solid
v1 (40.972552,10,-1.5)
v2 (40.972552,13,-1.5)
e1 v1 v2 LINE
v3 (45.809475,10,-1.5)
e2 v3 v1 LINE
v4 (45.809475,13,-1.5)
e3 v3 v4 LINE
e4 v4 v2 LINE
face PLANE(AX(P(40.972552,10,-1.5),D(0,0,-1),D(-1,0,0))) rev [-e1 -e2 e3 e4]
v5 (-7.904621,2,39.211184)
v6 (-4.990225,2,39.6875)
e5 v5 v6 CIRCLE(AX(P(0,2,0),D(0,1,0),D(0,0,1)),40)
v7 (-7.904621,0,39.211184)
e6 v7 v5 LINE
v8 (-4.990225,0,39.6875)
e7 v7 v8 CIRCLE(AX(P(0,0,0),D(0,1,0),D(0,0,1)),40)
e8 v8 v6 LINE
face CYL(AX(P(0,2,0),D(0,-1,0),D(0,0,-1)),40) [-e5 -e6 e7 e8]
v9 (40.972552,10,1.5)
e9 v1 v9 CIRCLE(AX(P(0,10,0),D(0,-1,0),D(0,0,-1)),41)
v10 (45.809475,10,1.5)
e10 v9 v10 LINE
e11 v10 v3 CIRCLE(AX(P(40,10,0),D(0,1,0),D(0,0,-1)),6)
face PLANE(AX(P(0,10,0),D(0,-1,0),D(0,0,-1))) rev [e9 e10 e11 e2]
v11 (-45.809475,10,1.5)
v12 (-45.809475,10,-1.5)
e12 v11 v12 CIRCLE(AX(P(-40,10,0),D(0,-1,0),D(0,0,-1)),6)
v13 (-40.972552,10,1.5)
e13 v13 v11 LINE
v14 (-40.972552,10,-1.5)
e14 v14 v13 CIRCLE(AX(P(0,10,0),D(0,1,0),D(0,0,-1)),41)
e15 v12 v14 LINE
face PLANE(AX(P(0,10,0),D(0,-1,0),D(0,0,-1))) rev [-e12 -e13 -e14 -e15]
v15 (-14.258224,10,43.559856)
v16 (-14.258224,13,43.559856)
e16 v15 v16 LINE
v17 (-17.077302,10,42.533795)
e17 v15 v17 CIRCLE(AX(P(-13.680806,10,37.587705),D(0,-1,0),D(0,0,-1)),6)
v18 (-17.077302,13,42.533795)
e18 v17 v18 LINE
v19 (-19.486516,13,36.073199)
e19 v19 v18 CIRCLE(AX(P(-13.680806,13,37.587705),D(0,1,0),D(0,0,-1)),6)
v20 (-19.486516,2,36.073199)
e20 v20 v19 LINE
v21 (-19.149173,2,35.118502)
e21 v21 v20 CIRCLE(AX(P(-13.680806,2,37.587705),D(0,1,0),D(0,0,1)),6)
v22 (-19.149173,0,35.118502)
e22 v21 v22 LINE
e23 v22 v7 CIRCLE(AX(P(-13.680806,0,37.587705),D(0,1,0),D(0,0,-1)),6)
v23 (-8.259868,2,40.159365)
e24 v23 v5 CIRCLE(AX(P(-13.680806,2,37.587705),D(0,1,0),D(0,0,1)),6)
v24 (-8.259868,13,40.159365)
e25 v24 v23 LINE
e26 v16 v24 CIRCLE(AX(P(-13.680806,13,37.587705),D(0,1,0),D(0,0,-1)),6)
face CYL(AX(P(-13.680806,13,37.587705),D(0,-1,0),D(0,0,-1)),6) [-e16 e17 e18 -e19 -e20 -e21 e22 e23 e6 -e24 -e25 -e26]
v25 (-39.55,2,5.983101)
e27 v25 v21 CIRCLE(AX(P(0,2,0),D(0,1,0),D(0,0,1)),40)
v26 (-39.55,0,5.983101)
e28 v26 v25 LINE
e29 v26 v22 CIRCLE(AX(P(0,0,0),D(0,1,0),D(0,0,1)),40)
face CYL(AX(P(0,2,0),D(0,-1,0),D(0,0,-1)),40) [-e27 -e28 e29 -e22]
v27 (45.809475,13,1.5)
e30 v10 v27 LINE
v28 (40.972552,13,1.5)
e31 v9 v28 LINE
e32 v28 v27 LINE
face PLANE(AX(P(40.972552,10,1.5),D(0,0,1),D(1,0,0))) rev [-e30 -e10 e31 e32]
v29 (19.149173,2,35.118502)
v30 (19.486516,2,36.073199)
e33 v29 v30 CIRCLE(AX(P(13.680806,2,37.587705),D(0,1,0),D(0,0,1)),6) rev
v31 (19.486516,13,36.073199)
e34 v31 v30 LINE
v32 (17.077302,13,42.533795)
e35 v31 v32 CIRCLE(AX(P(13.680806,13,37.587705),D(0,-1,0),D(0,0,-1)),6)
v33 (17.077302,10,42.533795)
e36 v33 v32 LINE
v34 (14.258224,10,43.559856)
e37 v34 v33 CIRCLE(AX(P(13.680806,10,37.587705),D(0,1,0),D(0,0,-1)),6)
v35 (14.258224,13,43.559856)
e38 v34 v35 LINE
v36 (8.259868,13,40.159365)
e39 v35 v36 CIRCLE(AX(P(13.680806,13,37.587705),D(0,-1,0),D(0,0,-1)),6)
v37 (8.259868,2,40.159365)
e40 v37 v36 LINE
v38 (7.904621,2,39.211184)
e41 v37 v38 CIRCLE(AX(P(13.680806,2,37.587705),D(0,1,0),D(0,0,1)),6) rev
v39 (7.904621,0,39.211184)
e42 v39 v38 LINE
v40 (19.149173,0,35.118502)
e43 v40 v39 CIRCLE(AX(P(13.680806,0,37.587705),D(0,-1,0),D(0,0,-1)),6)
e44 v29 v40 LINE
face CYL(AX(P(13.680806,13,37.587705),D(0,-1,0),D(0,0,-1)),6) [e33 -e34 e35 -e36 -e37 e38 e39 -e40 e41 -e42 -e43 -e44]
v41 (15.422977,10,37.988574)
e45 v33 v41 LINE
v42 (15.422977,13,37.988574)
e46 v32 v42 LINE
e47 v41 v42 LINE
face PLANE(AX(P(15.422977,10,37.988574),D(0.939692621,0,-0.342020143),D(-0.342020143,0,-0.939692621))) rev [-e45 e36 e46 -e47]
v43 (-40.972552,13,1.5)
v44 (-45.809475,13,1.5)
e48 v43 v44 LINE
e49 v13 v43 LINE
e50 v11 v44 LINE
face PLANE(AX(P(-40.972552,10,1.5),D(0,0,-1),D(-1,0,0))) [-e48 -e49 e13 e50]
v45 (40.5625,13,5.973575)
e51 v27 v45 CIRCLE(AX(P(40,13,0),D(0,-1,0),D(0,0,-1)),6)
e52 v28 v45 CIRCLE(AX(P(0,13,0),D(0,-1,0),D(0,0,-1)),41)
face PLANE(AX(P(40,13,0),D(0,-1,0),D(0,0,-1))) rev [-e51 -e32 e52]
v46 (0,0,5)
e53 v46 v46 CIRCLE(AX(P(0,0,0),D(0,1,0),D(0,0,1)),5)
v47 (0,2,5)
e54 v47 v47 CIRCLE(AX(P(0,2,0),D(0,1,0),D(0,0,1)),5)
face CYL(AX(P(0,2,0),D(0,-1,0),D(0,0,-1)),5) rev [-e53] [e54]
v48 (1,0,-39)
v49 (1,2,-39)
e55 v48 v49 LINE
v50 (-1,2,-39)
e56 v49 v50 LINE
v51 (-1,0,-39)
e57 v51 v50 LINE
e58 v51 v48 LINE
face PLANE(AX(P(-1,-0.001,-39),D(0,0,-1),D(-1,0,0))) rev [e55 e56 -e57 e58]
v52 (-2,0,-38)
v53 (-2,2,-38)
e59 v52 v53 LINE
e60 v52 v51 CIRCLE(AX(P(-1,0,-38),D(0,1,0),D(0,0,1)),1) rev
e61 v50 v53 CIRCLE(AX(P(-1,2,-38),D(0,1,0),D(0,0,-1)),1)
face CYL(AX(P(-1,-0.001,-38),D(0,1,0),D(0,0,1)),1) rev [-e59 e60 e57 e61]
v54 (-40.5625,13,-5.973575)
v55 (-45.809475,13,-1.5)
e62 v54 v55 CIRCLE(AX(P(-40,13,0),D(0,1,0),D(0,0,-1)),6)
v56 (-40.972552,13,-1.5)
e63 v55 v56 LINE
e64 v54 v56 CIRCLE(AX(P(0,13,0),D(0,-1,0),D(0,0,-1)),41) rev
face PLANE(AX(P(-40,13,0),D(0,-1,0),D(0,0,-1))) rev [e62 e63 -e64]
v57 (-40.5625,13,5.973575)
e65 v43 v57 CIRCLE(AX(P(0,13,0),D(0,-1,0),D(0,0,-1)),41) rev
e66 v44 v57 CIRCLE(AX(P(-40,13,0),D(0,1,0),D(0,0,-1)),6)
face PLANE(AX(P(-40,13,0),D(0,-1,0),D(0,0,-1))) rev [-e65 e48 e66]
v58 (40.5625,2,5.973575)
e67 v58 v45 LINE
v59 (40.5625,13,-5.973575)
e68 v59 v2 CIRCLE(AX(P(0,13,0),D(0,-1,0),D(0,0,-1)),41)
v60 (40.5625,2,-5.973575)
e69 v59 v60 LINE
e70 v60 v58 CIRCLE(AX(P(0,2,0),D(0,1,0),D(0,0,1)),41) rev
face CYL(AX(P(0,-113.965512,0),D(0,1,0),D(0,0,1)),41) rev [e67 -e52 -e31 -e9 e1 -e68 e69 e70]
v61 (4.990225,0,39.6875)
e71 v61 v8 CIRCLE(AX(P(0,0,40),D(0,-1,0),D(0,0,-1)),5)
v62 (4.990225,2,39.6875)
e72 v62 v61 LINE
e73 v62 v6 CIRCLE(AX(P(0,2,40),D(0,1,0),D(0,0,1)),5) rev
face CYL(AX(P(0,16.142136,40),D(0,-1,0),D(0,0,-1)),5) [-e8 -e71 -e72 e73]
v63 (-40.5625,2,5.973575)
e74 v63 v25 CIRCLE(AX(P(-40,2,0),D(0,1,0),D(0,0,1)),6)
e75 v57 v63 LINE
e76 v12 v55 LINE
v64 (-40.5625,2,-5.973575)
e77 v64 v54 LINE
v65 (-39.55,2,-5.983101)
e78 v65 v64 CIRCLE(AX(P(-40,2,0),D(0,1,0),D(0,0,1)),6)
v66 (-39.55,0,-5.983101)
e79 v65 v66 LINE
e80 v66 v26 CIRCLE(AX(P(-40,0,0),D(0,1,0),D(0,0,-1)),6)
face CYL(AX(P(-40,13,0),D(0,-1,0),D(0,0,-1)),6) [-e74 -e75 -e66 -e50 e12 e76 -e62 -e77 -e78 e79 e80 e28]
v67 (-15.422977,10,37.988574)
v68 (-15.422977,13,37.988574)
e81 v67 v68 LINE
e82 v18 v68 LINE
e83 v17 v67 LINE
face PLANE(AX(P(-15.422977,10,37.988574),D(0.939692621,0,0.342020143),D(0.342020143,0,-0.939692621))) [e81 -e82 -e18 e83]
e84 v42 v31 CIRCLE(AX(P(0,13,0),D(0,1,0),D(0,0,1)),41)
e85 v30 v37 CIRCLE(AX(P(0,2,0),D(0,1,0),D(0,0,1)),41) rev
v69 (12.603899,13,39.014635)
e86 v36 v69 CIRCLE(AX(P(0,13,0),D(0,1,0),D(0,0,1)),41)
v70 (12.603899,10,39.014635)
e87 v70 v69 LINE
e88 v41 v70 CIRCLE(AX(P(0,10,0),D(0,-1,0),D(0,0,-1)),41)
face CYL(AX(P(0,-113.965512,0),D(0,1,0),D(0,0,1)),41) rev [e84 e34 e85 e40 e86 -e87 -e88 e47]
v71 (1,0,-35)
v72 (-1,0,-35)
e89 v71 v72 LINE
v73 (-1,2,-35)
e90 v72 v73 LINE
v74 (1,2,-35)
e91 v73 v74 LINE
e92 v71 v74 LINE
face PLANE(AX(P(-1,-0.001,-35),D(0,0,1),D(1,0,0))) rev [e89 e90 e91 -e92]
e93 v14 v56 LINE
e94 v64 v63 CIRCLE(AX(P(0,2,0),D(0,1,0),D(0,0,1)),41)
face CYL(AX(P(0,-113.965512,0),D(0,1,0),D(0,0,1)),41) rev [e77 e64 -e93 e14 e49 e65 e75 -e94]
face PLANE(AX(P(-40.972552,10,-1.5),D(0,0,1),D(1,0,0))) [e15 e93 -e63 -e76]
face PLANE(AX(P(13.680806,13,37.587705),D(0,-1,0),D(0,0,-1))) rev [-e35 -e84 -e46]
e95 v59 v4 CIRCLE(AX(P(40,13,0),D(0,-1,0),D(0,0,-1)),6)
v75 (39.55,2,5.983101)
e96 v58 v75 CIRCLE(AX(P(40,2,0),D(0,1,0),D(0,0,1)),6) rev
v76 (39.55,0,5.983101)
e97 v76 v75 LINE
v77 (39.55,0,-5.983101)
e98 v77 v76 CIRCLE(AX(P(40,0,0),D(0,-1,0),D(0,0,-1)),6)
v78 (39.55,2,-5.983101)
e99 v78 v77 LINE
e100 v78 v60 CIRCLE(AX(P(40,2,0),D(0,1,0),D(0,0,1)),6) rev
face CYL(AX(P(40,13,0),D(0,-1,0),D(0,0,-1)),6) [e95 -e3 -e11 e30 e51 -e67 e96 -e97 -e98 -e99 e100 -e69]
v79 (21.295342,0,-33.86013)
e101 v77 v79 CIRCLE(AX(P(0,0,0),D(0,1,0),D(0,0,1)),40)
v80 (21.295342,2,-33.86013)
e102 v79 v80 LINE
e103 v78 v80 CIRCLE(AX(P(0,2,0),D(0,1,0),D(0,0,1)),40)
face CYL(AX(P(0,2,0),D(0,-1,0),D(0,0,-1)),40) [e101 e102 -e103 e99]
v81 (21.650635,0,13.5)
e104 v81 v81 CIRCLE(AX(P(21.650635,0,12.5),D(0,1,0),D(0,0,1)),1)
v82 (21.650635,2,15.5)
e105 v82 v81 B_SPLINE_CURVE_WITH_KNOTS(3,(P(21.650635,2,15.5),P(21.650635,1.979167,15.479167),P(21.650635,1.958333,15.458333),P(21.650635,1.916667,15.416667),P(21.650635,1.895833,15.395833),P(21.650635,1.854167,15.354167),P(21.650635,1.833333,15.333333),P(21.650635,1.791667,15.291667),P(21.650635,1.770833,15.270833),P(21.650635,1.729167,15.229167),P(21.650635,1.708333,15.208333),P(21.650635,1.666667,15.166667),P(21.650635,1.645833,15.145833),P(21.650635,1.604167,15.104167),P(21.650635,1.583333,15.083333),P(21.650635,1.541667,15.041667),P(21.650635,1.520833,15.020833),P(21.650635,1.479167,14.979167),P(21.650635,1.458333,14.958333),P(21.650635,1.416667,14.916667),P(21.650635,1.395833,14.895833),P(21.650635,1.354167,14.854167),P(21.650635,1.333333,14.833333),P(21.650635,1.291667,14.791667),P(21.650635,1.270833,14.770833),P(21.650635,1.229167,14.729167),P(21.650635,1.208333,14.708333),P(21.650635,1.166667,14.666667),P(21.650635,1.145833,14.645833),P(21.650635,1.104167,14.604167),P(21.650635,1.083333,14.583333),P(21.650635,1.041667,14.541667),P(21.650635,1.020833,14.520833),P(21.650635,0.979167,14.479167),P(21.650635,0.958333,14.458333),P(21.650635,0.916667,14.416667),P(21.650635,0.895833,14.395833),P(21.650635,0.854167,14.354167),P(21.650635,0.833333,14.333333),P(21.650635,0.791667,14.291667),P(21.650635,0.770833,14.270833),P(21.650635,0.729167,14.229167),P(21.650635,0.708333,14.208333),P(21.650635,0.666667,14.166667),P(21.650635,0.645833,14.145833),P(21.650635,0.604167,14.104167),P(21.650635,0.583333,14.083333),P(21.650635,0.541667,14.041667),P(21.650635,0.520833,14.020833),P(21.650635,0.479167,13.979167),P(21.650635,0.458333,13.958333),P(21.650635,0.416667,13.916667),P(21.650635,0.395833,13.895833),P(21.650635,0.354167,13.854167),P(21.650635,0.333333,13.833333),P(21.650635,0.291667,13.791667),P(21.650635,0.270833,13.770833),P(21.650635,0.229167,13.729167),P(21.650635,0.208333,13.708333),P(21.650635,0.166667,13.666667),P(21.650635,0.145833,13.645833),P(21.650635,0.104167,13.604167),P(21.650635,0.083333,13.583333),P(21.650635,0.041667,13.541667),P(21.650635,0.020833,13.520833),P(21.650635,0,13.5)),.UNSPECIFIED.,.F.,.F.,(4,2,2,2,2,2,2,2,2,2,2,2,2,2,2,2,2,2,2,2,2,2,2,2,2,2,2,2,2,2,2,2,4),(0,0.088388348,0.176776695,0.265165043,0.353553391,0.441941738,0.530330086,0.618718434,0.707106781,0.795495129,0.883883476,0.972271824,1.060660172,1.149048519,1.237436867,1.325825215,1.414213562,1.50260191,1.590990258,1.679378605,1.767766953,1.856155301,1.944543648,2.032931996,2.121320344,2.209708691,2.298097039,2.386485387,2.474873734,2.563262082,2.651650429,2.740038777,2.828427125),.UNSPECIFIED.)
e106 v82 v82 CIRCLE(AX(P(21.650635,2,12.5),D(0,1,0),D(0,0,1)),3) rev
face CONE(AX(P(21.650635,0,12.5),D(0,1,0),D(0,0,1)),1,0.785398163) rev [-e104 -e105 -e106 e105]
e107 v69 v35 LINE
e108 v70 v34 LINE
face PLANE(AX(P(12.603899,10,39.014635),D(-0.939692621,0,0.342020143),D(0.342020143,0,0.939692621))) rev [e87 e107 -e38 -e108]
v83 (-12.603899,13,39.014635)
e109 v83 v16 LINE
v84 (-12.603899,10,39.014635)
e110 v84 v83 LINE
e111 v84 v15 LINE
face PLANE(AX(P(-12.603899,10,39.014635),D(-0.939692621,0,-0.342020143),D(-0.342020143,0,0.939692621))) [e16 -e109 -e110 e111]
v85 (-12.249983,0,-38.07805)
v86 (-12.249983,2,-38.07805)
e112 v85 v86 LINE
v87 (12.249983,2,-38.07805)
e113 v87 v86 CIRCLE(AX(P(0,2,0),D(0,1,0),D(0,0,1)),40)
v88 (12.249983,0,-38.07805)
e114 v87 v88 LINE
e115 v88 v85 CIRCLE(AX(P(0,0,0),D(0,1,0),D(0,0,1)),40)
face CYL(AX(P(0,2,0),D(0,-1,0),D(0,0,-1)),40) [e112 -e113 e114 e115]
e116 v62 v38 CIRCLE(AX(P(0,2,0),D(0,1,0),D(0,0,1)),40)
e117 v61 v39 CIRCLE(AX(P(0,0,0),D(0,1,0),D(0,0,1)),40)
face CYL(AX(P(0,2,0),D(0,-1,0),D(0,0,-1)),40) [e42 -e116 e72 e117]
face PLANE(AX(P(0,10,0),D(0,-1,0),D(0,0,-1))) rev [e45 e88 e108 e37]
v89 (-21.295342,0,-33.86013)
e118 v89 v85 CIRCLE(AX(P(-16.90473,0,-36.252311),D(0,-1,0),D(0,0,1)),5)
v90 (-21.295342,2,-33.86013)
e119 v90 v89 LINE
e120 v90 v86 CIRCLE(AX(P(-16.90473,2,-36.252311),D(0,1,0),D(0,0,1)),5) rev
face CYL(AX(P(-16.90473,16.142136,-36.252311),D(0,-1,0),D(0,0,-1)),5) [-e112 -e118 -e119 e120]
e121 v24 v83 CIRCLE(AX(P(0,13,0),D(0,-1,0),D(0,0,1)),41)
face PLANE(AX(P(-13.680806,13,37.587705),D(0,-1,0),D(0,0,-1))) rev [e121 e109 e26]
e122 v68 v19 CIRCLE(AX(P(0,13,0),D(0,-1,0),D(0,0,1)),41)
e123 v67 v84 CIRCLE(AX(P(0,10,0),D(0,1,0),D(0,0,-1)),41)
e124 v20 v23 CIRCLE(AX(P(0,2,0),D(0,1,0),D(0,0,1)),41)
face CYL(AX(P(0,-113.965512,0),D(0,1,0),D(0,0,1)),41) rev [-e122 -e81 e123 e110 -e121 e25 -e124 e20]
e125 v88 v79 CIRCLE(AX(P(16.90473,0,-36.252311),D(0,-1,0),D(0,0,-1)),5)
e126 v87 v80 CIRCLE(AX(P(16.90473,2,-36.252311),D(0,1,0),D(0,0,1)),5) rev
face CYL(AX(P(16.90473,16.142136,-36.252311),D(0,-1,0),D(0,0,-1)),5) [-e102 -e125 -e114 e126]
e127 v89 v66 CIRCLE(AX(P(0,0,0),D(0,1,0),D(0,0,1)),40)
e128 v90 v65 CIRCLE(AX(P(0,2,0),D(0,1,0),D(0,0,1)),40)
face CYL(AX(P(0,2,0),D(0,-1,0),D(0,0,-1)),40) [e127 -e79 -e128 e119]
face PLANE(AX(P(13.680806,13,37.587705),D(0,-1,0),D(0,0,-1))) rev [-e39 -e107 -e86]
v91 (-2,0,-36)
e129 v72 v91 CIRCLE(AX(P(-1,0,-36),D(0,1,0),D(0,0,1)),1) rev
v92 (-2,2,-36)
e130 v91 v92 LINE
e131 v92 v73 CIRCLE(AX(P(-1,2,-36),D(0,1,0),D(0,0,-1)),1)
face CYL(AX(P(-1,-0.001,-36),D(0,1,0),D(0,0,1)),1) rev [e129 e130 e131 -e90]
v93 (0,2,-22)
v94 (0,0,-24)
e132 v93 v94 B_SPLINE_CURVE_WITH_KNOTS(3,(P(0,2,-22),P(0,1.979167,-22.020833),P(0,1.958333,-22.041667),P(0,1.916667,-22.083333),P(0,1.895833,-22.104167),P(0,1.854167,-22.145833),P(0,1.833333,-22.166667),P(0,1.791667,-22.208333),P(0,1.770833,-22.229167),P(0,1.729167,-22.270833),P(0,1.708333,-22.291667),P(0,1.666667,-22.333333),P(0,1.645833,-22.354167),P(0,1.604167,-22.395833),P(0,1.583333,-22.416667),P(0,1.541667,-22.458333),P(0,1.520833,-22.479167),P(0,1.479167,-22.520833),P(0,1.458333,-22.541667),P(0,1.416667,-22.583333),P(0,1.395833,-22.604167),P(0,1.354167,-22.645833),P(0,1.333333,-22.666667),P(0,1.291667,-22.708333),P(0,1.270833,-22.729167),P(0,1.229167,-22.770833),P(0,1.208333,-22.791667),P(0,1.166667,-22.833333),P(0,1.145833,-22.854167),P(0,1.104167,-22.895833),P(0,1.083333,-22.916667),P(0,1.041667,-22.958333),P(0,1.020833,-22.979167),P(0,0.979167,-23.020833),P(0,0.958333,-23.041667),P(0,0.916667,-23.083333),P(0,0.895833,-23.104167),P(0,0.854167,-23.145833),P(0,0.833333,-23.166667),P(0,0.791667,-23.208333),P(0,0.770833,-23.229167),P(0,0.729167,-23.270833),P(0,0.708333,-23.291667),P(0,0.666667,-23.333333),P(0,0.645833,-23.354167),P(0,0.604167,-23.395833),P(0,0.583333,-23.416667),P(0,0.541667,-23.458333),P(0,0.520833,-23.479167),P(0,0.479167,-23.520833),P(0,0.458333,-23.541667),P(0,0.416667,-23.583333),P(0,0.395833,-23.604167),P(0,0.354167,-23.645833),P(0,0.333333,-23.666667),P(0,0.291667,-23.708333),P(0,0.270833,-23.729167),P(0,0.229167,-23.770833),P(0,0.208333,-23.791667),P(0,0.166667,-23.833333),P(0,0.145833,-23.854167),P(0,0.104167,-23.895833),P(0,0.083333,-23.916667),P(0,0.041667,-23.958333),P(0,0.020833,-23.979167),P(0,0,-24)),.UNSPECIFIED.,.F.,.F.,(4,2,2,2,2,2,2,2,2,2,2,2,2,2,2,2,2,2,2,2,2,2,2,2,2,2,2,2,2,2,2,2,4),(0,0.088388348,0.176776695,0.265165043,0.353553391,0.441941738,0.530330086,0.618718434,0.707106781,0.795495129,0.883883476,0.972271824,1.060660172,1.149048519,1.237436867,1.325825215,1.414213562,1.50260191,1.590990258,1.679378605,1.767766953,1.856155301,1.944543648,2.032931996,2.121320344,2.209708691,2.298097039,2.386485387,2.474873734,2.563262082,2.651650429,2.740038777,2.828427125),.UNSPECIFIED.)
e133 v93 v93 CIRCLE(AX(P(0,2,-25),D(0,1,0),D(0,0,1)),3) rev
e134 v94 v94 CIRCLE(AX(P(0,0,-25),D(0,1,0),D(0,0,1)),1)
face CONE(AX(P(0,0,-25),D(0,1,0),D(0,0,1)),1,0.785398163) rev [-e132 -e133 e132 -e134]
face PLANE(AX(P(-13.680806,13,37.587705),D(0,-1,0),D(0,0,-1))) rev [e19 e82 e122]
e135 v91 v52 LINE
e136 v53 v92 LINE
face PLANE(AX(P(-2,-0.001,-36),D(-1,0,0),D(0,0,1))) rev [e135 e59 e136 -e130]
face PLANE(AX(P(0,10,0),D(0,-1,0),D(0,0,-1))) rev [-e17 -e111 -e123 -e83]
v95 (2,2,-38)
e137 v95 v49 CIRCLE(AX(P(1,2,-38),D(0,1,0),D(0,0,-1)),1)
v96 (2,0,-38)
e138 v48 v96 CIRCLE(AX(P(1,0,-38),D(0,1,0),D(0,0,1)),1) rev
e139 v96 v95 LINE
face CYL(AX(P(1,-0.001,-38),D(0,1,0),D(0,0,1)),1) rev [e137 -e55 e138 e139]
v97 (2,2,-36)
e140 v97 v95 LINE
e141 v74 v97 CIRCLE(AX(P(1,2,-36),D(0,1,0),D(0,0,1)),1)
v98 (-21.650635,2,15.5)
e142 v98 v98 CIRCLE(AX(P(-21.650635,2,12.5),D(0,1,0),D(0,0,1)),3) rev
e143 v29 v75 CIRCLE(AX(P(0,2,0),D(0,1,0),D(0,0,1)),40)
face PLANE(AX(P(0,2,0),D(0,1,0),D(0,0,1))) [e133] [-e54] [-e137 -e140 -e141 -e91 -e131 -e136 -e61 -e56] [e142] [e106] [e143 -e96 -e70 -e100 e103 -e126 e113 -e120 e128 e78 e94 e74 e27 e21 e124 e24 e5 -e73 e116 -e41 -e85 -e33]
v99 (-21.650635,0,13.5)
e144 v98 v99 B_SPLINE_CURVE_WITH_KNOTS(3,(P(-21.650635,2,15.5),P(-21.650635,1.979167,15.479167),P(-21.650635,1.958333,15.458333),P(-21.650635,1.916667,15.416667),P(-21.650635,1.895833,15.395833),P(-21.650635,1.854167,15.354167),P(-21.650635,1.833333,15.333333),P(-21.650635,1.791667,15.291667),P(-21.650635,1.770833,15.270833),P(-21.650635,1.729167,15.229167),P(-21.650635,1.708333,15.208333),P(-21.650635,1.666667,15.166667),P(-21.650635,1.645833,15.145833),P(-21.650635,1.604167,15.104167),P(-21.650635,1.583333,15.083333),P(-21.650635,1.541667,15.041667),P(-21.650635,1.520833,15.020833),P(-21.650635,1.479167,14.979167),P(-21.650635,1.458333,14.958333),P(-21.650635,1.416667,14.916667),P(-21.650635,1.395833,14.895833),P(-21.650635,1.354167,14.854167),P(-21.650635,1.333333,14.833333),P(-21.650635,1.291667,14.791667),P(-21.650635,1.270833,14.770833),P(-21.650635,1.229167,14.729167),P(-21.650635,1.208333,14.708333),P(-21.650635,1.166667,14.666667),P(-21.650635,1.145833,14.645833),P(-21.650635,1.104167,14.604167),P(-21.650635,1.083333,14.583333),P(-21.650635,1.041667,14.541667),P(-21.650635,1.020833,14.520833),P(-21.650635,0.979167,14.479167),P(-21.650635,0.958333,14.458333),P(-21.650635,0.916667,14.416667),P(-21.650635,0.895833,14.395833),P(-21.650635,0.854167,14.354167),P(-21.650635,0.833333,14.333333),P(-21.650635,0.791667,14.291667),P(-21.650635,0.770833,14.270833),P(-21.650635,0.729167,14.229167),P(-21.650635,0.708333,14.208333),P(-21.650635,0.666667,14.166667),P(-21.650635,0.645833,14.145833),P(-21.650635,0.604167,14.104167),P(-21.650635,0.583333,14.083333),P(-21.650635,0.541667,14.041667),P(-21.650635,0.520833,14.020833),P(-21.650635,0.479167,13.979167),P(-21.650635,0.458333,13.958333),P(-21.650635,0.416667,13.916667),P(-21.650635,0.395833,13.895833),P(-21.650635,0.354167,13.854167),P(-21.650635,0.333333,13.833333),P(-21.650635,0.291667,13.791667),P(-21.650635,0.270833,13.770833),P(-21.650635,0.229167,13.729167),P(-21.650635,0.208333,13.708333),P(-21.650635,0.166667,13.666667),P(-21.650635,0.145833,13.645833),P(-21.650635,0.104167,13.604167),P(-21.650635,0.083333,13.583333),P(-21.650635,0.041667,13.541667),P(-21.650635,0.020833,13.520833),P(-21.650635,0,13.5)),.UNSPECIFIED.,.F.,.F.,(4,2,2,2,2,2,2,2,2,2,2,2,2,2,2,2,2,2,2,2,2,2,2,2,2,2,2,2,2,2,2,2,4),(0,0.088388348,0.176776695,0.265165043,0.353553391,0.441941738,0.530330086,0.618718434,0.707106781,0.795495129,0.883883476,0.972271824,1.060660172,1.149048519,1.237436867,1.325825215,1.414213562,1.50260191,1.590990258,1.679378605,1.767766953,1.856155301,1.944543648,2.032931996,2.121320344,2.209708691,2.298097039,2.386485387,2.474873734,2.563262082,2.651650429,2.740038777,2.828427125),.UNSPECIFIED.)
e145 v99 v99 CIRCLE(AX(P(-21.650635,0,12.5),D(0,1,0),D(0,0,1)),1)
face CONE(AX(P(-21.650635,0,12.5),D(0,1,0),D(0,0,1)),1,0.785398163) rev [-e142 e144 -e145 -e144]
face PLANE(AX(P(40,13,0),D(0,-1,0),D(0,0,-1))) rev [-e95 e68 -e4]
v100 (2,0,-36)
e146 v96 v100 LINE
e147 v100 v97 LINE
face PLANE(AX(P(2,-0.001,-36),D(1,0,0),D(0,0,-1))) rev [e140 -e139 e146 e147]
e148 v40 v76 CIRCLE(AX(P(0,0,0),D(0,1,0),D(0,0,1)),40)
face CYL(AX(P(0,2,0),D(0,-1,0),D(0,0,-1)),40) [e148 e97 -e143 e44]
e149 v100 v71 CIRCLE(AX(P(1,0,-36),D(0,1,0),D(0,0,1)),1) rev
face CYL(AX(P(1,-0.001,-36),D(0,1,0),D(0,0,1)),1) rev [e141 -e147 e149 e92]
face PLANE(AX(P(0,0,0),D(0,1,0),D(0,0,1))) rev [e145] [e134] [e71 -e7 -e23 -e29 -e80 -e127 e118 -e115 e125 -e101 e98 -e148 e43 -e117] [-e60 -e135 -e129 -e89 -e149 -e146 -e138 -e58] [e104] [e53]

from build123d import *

# Parameters (mm, degrees)
SKETCH1_R           = 40
SKETCH1_R_2         = 5
SKETCH1_R_3         = 1
BOSS_EXTRUDE1_DEPTH = 2
CUT_EXTRUDE1_REACH  = 58.604
SKETCH6_R           = 6
BOSS_EXTRUDE4_DEPTH = 13
SKETCH9_R           = 41
CUT_EXTRUDE2_DEPTH  = 11
CUT_EXTRUDE3_DEPTH  = 3
CHAMFER1_SIZE       = 2
SKETCH11_R          = 5
BOSS_EXTRUDE5_DEPTH = 2


with BuildPart() as part:
    # Sketch1 → Boss-Extrude1 (new body)
    with BuildSketch(Plane(origin=(0, 0, 0), x_dir=(1, 0, 0), z_dir=(0, 1, 0))):
        with Locations(Location((0, 0, 0), (0, 0, 270))):
            Circle(SKETCH1_R)
        with Locations(Location((0, 0, 0), (0, 0, 270))):
            Circle(SKETCH1_R_2, mode=Mode.SUBTRACT)
        with Locations(Location((0, 25, 0), (0, 0, 270))):
            Circle(SKETCH1_R_3, mode=Mode.SUBTRACT)
        with Locations(Location((21.650635095, -12.5, 0), (0, 0, 270))):
            Circle(SKETCH1_R_3, mode=Mode.SUBTRACT)
        with Locations(Location((-21.650635095, -12.5, 0), (0, 0, 270))):
            Circle(SKETCH1_R_3, mode=Mode.SUBTRACT)
    extrude(amount=BOSS_EXTRUDE1_DEPTH)

    # Sketch2 → Cut-Extrude1 (cut, up to next)
    with BuildSketch(Plane(origin=(0, 2, 0), x_dir=(1, 0, 0), z_dir=(0, 1, 0)), mode=Mode.PRIVATE) as cut_extrude1_sk1:
        with BuildLine():
            Line((-1, 35), (1, 35))
            ThreePointArc((1, 35), (1.707106781, 35.292893219), (2, 36))
            Line((2, 36), (2, 38))
            ThreePointArc((2, 38), (1.707106781, 38.707106781), (1, 39))
            Line((1, 39), (-1, 39))
            ThreePointArc((-1, 39), (-1.707106781, 38.707106781), (-2, 38))
            Line((-2, 38), (-2, 36))
            ThreePointArc((-2, 36), (-1.707106781, 35.292893219), (-1, 35))
        make_face()
    cut_extrude1_tool1 = extrude(cut_extrude1_sk1.sketch, amount=-CUT_EXTRUDE1_REACH, mode=Mode.PRIVATE) & part.part
    add(cut_extrude1_tool1.solids().sort_by_distance((0, 2, -37))[0], mode=Mode.SUBTRACT)

    # Sketch6 → Boss-Extrude4 (add)
    with BuildSketch(Plane.XZ):
        with Locations(Location((13.680805733, 37.587704831, 0), (0, 0, 270))):
            Circle(SKETCH6_R)
        with Locations(Location((40, 0, 0), (0, 0, 270))):
            Circle(SKETCH6_R)
    boss_extrude4 = extrude(amount=-BOSS_EXTRUDE4_DEPTH)

    # Sketch9 → Cut-Extrude2 (cut)
    with BuildSketch(Plane(origin=(0, 13, 0), x_dir=(1, 0, 0), z_dir=(0, 1, 0))):
        Circle(SKETCH9_R)
    cut_extrude2 = extrude(amount=-CUT_EXTRUDE2_DEPTH, mode=Mode.SUBTRACT)

    # Sketch10 → Cut-Extrude3 (cut)
    with BuildSketch(Plane(origin=(0, 13, 0), x_dir=(1, 0, 0), z_dir=(0, 1, 0))):
        with BuildLine():
            Line((40.972551788, 1.5), (45.809475019, 1.5))
            ThreePointArc((45.809475019, 1.5), (46, 0), (45.809475019, -1.5))
            Line((45.809475019, -1.5), (40.972551788, -1.5))
            ThreePointArc((40.972551788, -1.5), (41, 0), (40.972551788, 1.5))
        make_face()
        with BuildLine():
            Line((15.422976966, -37.988574355), (17.077302143, -42.533795423))
            ThreePointArc((17.077302143, -42.533795423), (15.732926593, -43.225860556), (14.258224281, -43.559855853))
            Line((14.258224281, -43.559855853), (12.603899104, -39.014634785))
            ThreePointArc((12.603899104, -39.014634785), (14.022825876, -38.527397452), (15.422976966, -37.988574355))
        make_face()
    cut_extrude3 = extrude(amount=-CUT_EXTRUDE3_DEPTH, mode=Mode.SUBTRACT)

    # Mirror2: Boss-Extrude4, Cut-Extrude2, Cut-Extrude3 across plane
    add(boss_extrude4.mirror(Plane(origin=(0, 0, 0), x_dir=(0, 0, 1), z_dir=(1, 0, 0))))
    add(cut_extrude2.mirror(Plane(origin=(0, 0, 0), x_dir=(0, 0, 1), z_dir=(1, 0, 0))), mode=Mode.SUBTRACT)
    add(cut_extrude3.mirror(Plane(origin=(0, 0, 0), x_dir=(0, 0, 1), z_dir=(1, 0, 0))), mode=Mode.SUBTRACT)

    # Chamfer1
    chamfer1_edges = [part.edges().sort_by_distance(p)[0] for p in [
        (21.650635095, 2, 11.5),
        (-21.650635095, 2, 11.5),
        (0, 2, -26),
    ]]
    chamfer(chamfer1_edges, length=CHAMFER1_SIZE - 0.0001)  # a hair under: the kernel refuses the full size

    # Sketch11 → Boss-Extrude5 (add)
    with BuildSketch(Plane.XZ):
        with Locations((0, 40)):
            Circle(SKETCH11_R)
        with Locations((16.90473047, -36.252311481)):
            Circle(SKETCH11_R)
        with Locations((-16.90473047, -36.252311481)):
            Circle(SKETCH11_R)
    extrude(amount=-BOSS_EXTRUDE5_DEPTH)


solid = part.part
